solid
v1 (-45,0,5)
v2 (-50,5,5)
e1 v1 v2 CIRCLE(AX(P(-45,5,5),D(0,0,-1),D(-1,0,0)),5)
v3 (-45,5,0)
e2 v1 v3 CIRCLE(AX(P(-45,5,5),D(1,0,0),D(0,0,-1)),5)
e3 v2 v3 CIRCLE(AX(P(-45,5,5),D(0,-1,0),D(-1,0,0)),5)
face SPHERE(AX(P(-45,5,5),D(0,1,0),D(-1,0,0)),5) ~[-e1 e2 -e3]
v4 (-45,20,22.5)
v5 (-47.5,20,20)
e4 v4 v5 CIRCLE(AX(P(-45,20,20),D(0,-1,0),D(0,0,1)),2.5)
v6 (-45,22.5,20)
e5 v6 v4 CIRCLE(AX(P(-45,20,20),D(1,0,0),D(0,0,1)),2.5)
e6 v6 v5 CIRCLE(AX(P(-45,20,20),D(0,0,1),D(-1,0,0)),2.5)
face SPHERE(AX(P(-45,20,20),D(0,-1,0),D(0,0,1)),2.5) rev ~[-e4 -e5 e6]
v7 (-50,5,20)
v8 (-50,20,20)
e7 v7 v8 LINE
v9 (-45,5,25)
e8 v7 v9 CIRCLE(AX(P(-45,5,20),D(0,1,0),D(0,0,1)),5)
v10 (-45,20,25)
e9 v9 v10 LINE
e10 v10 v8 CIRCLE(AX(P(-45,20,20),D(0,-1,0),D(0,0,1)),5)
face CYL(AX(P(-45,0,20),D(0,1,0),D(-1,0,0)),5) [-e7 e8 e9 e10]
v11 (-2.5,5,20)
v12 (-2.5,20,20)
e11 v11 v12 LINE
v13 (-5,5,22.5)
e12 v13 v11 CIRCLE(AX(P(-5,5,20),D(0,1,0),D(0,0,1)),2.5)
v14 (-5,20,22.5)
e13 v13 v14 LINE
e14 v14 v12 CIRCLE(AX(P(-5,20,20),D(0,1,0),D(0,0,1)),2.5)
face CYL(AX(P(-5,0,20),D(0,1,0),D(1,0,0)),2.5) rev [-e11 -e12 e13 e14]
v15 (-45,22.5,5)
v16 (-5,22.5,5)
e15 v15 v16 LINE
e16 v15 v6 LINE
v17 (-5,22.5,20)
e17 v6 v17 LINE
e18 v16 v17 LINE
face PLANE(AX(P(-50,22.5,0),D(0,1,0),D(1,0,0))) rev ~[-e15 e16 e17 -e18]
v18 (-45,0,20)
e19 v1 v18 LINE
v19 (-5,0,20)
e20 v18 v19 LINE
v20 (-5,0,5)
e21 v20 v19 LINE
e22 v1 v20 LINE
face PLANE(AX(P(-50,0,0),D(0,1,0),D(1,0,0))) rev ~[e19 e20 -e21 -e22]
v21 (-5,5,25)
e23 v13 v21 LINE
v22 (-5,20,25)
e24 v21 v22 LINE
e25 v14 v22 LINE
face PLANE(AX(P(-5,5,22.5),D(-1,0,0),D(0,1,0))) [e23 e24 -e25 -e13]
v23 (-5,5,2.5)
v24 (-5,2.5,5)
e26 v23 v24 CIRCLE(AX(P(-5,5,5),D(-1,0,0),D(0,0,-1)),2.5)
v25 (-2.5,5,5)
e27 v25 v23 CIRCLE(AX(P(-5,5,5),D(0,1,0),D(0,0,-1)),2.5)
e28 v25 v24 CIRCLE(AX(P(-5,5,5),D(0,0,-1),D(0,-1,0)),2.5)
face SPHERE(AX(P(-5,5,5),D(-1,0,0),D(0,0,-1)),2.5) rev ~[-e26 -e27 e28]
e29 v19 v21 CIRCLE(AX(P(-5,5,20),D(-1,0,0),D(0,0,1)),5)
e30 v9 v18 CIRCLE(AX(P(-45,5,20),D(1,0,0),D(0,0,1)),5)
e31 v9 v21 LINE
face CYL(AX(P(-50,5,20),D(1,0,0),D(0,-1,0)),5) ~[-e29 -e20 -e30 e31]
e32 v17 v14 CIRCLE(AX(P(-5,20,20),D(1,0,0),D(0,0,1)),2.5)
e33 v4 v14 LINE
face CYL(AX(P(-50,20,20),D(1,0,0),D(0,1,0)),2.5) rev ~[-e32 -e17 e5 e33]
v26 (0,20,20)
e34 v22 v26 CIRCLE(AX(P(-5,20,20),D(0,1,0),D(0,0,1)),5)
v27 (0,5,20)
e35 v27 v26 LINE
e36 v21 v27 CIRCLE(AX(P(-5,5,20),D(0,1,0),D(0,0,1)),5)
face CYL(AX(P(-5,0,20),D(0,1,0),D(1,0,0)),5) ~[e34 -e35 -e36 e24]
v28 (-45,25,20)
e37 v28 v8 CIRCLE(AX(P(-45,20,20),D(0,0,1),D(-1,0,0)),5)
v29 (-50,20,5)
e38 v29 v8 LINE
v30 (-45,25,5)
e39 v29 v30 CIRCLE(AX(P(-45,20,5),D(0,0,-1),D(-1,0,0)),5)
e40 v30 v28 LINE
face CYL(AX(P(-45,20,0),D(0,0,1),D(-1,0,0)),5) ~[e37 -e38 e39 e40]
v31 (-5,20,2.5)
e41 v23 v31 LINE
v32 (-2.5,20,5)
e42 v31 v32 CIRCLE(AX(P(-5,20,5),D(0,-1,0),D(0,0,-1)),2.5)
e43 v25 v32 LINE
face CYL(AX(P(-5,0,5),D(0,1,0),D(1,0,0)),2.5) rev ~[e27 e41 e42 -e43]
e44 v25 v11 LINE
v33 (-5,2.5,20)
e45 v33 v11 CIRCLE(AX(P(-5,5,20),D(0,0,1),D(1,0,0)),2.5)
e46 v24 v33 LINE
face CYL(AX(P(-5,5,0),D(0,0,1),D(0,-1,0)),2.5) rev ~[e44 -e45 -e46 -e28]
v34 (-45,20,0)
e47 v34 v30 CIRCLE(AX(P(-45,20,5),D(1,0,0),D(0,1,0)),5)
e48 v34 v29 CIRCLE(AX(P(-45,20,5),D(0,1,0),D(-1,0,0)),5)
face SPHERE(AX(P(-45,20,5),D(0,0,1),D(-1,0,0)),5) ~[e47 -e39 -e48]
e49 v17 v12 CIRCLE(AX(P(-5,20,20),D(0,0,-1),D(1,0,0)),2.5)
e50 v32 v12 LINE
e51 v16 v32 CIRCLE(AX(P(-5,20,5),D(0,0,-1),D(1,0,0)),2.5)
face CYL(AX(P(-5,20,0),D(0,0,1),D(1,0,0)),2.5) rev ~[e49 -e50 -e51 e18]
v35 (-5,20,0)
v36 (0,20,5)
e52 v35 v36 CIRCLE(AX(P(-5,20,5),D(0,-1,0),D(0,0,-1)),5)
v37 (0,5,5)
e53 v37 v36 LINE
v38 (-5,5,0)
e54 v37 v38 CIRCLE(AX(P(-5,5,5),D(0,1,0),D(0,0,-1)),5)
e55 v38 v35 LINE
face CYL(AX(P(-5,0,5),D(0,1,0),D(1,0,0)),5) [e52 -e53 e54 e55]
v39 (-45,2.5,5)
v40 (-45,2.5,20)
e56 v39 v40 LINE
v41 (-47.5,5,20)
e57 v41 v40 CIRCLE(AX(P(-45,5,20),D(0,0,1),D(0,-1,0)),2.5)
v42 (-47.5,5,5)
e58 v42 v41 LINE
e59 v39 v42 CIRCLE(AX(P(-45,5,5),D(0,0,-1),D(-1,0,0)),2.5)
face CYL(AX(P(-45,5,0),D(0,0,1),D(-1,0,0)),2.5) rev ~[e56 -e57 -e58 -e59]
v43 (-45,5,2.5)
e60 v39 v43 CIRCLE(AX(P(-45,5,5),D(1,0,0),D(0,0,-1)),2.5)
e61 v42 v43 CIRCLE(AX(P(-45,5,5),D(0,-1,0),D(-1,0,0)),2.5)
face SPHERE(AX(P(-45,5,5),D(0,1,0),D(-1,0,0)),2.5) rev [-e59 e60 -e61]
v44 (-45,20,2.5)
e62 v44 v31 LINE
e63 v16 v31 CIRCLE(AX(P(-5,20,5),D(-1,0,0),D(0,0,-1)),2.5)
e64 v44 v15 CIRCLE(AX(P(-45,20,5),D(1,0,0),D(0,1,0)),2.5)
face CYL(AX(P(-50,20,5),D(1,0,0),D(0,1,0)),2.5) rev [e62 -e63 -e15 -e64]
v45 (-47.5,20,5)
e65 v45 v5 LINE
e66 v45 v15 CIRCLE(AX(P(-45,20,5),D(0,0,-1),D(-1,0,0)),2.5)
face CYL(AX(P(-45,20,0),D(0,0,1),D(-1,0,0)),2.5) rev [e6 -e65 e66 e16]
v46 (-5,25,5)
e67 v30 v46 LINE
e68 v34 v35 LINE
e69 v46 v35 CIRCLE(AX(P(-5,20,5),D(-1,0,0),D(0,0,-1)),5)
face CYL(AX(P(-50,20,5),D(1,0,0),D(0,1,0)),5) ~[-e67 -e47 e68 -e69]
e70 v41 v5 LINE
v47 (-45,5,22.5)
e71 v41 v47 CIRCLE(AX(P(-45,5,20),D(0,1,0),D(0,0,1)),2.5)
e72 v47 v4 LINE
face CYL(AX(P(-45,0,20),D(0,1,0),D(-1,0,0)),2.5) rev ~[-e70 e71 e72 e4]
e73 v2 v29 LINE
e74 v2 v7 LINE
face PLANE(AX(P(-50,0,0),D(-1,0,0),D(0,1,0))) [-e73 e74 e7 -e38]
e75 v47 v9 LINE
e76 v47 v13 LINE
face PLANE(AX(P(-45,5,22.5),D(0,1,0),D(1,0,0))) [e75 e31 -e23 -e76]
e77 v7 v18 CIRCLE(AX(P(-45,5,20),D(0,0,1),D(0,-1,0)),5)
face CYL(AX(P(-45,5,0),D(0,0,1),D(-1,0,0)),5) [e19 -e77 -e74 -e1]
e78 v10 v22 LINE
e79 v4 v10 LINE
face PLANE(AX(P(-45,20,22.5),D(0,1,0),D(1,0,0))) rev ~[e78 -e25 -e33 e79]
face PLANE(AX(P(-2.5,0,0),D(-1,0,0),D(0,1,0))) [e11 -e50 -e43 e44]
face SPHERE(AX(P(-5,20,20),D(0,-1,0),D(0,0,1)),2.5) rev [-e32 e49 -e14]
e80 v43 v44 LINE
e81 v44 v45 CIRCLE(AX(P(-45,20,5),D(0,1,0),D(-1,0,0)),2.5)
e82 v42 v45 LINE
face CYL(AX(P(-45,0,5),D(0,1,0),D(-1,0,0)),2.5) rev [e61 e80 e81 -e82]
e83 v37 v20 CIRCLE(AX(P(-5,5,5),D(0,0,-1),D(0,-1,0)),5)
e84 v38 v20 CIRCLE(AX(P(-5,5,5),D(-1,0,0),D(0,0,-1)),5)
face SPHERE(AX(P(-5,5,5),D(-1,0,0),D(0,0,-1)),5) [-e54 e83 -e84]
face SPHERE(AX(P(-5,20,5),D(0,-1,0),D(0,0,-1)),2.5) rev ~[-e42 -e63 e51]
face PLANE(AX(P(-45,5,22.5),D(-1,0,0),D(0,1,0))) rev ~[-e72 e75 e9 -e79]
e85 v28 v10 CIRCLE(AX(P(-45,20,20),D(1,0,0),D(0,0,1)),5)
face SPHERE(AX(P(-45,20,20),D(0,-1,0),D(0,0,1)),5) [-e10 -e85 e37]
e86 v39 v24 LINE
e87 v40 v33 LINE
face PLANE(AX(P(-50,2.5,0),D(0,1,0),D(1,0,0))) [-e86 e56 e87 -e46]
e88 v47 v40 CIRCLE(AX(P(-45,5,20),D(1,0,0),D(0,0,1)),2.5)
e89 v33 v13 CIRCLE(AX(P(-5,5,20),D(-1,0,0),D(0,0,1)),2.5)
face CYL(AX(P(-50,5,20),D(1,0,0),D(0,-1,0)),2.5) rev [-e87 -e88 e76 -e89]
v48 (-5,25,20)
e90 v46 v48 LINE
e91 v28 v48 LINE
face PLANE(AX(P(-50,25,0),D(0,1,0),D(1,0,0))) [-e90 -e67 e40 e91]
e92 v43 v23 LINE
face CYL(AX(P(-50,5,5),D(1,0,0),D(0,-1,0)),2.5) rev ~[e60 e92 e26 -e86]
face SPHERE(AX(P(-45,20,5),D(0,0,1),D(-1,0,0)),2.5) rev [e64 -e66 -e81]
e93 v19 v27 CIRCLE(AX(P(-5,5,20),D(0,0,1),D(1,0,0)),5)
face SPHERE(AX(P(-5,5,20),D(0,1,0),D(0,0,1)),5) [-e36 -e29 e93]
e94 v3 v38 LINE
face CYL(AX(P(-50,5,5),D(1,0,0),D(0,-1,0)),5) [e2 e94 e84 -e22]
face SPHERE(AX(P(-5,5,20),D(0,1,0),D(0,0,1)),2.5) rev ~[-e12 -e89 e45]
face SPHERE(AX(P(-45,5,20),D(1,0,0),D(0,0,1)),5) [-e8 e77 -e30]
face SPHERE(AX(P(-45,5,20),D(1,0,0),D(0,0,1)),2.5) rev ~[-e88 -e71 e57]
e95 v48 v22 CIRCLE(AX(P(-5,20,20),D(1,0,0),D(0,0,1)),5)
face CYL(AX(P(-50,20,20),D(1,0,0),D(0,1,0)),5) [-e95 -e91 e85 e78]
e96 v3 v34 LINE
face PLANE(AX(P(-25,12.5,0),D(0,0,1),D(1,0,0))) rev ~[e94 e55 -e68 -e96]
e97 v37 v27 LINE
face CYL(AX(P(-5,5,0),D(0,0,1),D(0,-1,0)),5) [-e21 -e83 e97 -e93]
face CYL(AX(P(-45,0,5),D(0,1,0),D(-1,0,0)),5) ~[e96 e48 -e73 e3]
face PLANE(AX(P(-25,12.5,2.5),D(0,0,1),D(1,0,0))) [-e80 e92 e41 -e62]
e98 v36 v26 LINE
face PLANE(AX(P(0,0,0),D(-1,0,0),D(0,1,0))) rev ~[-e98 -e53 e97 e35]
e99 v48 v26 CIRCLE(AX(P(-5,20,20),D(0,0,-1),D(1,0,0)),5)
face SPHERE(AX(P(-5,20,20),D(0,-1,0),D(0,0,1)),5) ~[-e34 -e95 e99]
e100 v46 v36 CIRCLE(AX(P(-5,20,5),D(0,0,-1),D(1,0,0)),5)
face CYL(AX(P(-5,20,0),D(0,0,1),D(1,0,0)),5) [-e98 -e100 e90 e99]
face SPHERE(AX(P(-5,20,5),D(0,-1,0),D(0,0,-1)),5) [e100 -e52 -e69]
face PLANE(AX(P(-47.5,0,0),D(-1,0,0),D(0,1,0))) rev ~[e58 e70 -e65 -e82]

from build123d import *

# Parameters (mm, degrees)
F0_W     = 50
F0_H     = 25
F1_DEPTH = 25
F2_R     = 5
F3_T     = -2.5


# Not quite as in the source:
# - a shell that OpenCascade refuses in one call is made with other operations: the cavity is built on its own and cut out


with BuildPart() as f1:
    # F0 (on Top) → F1 (new body)
    with BuildSketch(Plane.XY):
        with Locations((-25, 12.5)):
            Rectangle(F0_W, F0_H)
    extrude(amount=F1_DEPTH)

    # F2
    f2_edges = [f1.edges().sort_by_distance(p)[0] for p in [
        (0, 12.5, 25),
        (-25, 0, 25),
        (-50, 12.5, 25),
        (-25, 25, 25),
        (-50, 25, 12.5),
        (-50, 12.5, 0),
        (-50, 0, 12.5),
        (-25, 0, 0),
        (0, 12.5, 0),
        (-25, 25, 0),
        (0, 25, 12.5),
        (0, 0, 12.5),
    ]]
    fillet(f2_edges, radius=F2_R)

    # F3: a shell. OpenCascade refuses it in one call, so the cavity is built on its own and cut out:
    # the body offset inwards by the wall thickness, plus a prism from it out through each open face.
    f3_core = offset(f1.part, amount=F3_T, mode=Mode.PRIVATE)
    f3_exits = [f3_core.faces().sort_by_distance(p)[0] for p in [
        (-25, 12.5, 22.5),
    ]]
    add(f3_core, mode=Mode.SUBTRACT)
    extrude(f3_exits, amount=-F3_T, mode=Mode.SUBTRACT)


solid = f1.part
